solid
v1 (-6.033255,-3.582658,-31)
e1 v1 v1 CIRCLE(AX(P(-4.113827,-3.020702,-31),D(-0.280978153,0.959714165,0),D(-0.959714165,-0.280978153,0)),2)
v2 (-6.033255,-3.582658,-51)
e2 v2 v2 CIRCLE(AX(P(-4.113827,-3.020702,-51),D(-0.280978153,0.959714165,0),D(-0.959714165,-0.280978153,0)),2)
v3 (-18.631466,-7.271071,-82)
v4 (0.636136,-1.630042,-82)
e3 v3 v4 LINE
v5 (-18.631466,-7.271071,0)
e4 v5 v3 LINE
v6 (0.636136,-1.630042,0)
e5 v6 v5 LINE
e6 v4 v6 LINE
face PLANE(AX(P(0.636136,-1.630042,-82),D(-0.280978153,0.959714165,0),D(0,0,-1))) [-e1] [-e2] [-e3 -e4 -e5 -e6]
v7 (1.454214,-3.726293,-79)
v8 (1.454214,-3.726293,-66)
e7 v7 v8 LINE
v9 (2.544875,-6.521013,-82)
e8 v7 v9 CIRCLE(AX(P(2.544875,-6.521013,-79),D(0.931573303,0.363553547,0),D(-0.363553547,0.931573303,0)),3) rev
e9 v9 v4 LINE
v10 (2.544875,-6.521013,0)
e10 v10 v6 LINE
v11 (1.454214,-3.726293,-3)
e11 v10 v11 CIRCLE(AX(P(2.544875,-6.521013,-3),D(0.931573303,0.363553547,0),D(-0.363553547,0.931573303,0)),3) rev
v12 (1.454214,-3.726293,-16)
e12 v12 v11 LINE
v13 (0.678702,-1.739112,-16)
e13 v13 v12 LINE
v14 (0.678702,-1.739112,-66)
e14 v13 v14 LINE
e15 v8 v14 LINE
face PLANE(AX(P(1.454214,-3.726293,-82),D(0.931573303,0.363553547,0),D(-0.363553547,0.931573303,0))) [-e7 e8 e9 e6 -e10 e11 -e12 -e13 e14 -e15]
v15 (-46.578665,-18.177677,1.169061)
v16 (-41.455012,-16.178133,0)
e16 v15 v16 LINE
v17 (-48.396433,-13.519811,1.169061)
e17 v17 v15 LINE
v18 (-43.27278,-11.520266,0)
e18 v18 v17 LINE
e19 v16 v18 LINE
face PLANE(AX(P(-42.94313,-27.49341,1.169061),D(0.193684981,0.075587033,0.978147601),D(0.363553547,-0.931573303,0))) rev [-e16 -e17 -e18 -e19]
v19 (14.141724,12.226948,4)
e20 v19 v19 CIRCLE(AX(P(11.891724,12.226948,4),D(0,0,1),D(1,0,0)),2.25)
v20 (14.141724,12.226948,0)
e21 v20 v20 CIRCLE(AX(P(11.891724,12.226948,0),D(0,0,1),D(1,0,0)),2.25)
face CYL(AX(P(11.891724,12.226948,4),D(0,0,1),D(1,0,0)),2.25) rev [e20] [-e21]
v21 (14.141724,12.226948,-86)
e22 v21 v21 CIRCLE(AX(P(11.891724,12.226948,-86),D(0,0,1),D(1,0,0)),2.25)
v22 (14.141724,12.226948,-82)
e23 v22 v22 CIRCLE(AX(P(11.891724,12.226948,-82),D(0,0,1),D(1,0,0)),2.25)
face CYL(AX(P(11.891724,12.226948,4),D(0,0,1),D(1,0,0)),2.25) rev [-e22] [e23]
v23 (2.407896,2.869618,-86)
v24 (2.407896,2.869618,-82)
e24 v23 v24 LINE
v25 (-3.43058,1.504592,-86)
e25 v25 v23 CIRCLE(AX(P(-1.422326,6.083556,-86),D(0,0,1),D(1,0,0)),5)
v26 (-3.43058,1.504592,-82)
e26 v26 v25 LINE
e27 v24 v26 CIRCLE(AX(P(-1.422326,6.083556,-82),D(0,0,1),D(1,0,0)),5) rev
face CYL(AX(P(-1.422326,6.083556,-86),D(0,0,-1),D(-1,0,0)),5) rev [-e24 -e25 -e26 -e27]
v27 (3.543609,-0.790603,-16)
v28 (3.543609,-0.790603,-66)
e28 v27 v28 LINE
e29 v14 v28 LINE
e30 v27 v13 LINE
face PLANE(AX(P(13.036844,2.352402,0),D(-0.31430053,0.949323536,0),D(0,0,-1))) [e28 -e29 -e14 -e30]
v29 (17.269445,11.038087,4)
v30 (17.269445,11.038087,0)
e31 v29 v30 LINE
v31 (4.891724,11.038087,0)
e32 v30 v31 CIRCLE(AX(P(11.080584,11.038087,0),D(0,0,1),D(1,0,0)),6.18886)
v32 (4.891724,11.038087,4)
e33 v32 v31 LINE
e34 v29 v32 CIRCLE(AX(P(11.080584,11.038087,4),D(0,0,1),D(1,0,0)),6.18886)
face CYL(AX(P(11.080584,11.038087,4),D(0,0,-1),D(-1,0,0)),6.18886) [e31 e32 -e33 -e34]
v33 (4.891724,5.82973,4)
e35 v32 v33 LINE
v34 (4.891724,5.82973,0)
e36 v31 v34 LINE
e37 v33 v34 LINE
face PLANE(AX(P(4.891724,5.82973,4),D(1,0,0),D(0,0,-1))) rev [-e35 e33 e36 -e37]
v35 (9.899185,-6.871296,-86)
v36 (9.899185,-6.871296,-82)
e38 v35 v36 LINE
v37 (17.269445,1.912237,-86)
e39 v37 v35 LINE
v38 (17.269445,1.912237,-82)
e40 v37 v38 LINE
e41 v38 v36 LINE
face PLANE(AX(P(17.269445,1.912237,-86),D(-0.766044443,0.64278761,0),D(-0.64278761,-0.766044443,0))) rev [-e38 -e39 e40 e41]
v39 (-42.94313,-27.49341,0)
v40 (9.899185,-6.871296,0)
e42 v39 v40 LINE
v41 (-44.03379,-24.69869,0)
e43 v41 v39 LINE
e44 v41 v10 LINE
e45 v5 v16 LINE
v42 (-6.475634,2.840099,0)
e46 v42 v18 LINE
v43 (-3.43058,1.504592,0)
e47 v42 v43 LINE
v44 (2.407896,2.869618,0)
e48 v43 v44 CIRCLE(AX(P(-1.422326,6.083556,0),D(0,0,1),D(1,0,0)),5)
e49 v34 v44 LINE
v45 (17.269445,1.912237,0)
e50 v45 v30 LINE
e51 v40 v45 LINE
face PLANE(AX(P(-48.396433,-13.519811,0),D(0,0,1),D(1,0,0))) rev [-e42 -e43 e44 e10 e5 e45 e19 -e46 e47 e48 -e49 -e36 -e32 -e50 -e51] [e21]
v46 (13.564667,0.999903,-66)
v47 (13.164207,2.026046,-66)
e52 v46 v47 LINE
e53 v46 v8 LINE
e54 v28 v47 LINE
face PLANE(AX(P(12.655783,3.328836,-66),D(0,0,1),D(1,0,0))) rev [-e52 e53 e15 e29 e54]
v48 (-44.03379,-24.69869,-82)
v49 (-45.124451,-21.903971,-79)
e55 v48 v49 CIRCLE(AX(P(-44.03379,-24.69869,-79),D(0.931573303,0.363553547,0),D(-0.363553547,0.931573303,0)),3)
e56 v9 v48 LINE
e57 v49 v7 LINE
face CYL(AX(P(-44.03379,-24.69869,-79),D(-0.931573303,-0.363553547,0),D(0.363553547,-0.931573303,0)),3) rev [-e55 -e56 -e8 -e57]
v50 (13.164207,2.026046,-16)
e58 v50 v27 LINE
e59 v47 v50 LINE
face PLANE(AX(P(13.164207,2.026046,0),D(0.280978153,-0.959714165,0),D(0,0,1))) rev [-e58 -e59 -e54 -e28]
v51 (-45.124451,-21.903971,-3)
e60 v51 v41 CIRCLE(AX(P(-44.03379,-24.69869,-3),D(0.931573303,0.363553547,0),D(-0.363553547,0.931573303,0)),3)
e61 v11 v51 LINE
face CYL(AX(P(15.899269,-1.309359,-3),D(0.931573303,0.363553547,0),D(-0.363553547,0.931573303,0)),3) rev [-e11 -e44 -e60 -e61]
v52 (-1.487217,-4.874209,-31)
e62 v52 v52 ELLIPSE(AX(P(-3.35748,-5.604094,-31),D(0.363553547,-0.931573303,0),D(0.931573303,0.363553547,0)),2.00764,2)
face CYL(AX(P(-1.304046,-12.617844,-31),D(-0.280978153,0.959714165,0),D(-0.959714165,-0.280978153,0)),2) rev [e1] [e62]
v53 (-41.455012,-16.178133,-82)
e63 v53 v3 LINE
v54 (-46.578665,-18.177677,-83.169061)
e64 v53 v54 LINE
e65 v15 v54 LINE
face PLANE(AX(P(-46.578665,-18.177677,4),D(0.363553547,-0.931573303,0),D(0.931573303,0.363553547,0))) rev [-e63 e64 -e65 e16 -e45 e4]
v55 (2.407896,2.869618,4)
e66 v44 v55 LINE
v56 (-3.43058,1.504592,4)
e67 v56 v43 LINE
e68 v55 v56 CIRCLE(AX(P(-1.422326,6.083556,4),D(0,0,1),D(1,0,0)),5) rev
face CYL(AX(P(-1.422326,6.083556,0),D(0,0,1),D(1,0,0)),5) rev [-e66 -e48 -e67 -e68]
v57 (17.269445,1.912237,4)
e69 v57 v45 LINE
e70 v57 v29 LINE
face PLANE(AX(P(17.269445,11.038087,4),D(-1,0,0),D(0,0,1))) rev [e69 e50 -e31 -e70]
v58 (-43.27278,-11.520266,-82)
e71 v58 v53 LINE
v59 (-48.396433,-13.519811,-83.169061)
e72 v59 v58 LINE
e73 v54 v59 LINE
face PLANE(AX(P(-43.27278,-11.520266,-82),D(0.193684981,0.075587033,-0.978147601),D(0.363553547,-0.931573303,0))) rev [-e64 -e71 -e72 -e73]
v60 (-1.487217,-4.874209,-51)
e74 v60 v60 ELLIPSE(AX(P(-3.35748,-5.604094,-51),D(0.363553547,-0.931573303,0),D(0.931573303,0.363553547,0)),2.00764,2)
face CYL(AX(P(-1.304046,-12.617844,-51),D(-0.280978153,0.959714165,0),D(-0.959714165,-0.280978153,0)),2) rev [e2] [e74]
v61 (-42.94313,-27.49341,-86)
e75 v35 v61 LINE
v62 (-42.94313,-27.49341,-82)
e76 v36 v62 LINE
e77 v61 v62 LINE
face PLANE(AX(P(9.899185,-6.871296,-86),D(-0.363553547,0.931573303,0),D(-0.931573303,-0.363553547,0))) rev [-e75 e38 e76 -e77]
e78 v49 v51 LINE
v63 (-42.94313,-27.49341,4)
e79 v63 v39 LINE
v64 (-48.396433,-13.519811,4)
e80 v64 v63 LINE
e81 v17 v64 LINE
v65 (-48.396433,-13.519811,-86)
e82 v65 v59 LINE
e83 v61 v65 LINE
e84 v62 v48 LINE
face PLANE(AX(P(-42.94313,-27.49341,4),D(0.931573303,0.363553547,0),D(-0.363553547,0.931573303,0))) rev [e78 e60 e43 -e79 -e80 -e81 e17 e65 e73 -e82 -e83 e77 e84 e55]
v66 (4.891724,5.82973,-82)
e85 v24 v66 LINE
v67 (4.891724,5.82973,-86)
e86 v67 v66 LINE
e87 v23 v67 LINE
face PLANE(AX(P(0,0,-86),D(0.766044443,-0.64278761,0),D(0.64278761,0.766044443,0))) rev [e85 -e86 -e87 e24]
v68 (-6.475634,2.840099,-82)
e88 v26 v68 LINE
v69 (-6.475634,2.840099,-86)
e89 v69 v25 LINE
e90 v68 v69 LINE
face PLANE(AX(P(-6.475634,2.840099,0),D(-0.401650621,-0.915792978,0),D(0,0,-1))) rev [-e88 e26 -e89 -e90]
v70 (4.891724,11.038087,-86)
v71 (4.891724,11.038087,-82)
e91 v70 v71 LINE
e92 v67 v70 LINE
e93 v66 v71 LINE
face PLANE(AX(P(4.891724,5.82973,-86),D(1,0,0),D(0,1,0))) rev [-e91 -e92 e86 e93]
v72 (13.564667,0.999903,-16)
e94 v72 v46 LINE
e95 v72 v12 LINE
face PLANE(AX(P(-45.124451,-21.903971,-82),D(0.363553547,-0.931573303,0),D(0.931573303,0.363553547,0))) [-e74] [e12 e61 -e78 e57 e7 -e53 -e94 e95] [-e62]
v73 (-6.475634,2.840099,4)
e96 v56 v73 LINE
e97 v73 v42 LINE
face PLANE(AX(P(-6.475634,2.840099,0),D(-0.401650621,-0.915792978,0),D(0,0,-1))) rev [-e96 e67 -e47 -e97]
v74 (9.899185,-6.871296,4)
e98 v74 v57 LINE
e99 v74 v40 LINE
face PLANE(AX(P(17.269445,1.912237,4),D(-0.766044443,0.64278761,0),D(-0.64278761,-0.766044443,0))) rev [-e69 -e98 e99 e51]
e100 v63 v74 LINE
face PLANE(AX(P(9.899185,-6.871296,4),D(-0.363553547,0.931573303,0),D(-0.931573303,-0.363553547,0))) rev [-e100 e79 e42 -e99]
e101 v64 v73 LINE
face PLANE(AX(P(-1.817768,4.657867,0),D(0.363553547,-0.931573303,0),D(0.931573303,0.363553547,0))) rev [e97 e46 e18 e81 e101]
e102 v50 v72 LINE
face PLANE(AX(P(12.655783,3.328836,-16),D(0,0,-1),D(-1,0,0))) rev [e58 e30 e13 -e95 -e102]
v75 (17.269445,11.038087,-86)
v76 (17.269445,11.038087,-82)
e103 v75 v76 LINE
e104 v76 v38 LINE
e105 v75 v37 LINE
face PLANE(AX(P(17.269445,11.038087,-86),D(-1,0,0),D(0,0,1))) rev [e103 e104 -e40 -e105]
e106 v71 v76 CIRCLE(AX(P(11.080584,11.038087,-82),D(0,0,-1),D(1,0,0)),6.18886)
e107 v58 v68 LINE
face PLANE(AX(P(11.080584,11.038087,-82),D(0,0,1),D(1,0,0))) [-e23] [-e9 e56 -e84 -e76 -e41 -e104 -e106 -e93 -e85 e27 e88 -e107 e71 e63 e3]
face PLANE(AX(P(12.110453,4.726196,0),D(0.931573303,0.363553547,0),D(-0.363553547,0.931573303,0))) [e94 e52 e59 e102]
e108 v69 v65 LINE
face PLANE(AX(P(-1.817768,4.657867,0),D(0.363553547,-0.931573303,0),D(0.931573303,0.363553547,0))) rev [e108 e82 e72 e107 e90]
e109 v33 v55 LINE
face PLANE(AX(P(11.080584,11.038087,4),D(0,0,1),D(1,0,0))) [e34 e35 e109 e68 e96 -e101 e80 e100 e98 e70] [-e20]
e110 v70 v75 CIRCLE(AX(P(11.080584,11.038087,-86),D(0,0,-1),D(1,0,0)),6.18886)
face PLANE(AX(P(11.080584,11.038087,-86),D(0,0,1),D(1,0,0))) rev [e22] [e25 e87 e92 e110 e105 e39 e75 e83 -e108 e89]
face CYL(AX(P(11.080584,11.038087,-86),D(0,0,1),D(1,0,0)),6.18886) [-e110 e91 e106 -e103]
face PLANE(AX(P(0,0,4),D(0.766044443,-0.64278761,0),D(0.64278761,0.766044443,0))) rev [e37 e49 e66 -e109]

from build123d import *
from OCP.BRepFilletAPI import BRepFilletAPI_MakeChamfer

# Parameters (mm, degrees)
ESTRUSIONE_ESTRUSIONE1_DEPTH = 4
ESTRUSIONE_ESTRUSIONE2_DEPTH = 82
ESTRUSIONE_ESTRUSIONE3_START = 4
ESTRUSIONE_ESTRUSIONE3_DEPTH = 4
FORO_PER_VITE_M4_1_D         = 4.5
FORO_PER_VITE_M4_1_DEPTH     = 188
FORO_PER_VITE_M4_1_TIP       = 1.351936393
SCHIZZO6_W                   = 50
SCHIZZO6_H                   = 4
ESTRUSIONE_ESTRUSIONE4_DEPTH = 5
SMUSSO1_SIZE                 = 5.5
SMUSSO1_SIZE2                = 1.169061089
RACCORDO1_R                  = 3
SMUSSO2_SIZE                 = 5
RACCORDO2_START              = -86
RACCORDO2_DEPTH              = 4
RACCORDO2_2_DEPTH            = 4
SCHIZZO7_W                   = 50
SCHIZZO7_H                   = 2.5
ESTRUSIONE_ESTRUSIONE5_DEPTH = 13
SMUSSO3_SIZE                 = 20
SMUSSO3_SIZE_2               = 1.048155586
SMUSSO4_SIZE                 = 20
SMUSSO4_SIZE2                = 1.749773271
SMUSSO5_SIZE                 = 10
SMUSSO5_SIZE2                = 0.350328071
SCHIZZO8_R                   = 2
TAGLIO_ESTRUSIONE1_DEPTH     = 10


with BuildPart() as part:
    # Schizzo1 → Estrusione-Estrusione1 (new body)
    with BuildSketch(Plane.XY):
        with BuildLine():
            Line((4.891723927, 5.829729564), (4.891723927, 11.038087105))
            ThreePointArc((4.891723927, 11.038087105), (11.08058435, 17.226947528), (17.269444773, 11.038087105))
            Line((17.269444773, 11.038087105), (17.269444773, 1.912236928))
            Line((17.269444773, 1.912236928), (9.899185428, -6.871296125))
            Line((9.899185428, -6.871296125), (-42.94312967, -27.493410377))
            Line((-42.94312967, -27.493410377), (-46.57866514, -18.177677349))
            Line((-46.57866514, -18.177677349), (0, 0))
            Line((0, 0), (4.891723927, 5.829729564))
        make_face()
    extrude(amount=ESTRUSIONE_ESTRUSIONE1_DEPTH)

    # Schizzo4 → Estrusione-Estrusione2 (add)
    with BuildSketch(Plane.XY):
        Polygon((-45.124450952, -21.90397056), (1.454214188, -3.726293211), (0, 0), (-46.57866514, -18.177677349), align=None)
    extrude(amount=-ESTRUSIONE_ESTRUSIONE2_DEPTH)

    # Schizzo5 → Estrusione-Estrusione3 (add)
    with BuildSketch(Plane(origin=(0, 0, -82), x_dir=(-1, 0, 0), z_dir=(0, 0, -1)).offset(ESTRUSIONE_ESTRUSIONE3_START)):
        with BuildLine():
            Line((42.94312967, -27.493410377), (46.57866514, -18.177677349))
            Line((46.57866514, -18.177677349), (0, 0))
            Line((0, 0), (-4.891723927, 5.829729564))
            Line((-4.891723927, 5.829729564), (-4.891723927, 11.038087105))
            ThreePointArc((-4.891723927, 11.038087105), (-11.08058435, 17.226947528), (-17.269444773, 11.038087105))
            Line((-17.269444773, 11.038087105), (-17.269444773, 1.912236928))
            Line((-17.269444773, 1.912236928), (-9.899185428, -6.871296125))
            Line((-9.899185428, -6.871296125), (42.94312967, -27.493410377))
        make_face()
    extrude(amount=-ESTRUSIONE_ESTRUSIONE3_DEPTH)

    # Foro per Vite M4-1
    with Locations(Plane.XY.offset(4)):
        with Locations((11.891723927, 12.226947528)):
            Hole(FORO_PER_VITE_M4_1_D / 2, depth=FORO_PER_VITE_M4_1_DEPTH)
            with Locations((0, 0, -(FORO_PER_VITE_M4_1_DEPTH + FORO_PER_VITE_M4_1_TIP / 2))):  # 118° drill point
                Cone(0, FORO_PER_VITE_M4_1_D / 2, FORO_PER_VITE_M4_1_TIP, mode=Mode.SUBTRACT)

    # Schizzo6 → Estrusione-Estrusione4 (add)
    with BuildSketch(Plane(origin=(0, 0, 0), x_dir=(0.9315733027957475, 0.36355354697516373, 0), z_dir=(-0.36355354697516373, 0.9315733027957475, 0))):
        with Locations((-25, 84)):
            Rectangle(SCHIZZO6_W, SCHIZZO6_H)
        with Locations((-25, -2)):
            Rectangle(SCHIZZO6_W, SCHIZZO6_H)
    extrude(amount=ESTRUSIONE_ESTRUSIONE4_DEPTH)

    # Smusso1: one chamfer whose edges measure the first distance from different faces: ONE call of the kernel's chamfer builder (chamfer() names one face for all edges)
    smusso1_edges_1 = [part.edges().sort_by_distance(p)[0] for p in [
        (-47.487549007, -15.848744092, -82),
    ]]
    smusso1_side_1 = [part.faces().sort_by_distance(p)[0] for p in [
        (-24.198216437, -6.759905417, -82),
    ]]
    smusso1_edges_2 = [part.edges().sort_by_distance(p)[0] for p in [
        (-47.487549007, -15.848744092, 0),
    ]]
    smusso1_side_2 = [part.faces().sort_by_distance(p)[0] for p in [
        (-24.198216437, -6.759905417, 0),
    ]]
    smusso1 = BRepFilletAPI_MakeChamfer(part.part.solid().wrapped)
    for e in smusso1_edges_1:
        smusso1.Add(SMUSSO1_SIZE, SMUSSO1_SIZE2, e.wrapped, smusso1_side_1[0].wrapped)  # the first distance lies on this face
    for e in smusso1_edges_2:
        smusso1.Add(SMUSSO1_SIZE, SMUSSO1_SIZE2, e.wrapped, smusso1_side_2[0].wrapped)  # the first distance lies on this face
    add(Compound.cast(smusso1.Shape()), mode=Mode.REPLACE)

    # Raccordo1
    raccordo1_edges = [part.edges().sort_by_distance(p)[0] for p in [
        (-21.835118382, -12.815131886, -82),
        (-21.835118382, -12.815131886, 0),
    ]]
    fillet(raccordo1_edges, radius=RACCORDO1_R)

    # Smusso2
    smusso2_edges = [part.edges().sort_by_distance(p)[0] for p in [
        (-1.817767735, 4.657866514, 2),
        (-1.817767735, 4.657866514, -84),
    ]]
    chamfer(smusso2_edges, length=SMUSSO2_SIZE - 0.0001)  # a hair under: the kernel refuses the full size

    # Raccordo2: read off the stored shape, not the designer's step
    # Raccordo2 outline → Raccordo2 (add)
    with BuildSketch(Plane.XY.offset(RACCORDO2_START)):
        with BuildLine():
            Line((0, 0), (2.407895765, 2.869618428))
            ThreePointArc((2.407895765, 2.869618428), (-0.284030607, 1.214852073), (-3.430579557, 1.504591587))
            Line((-3.430579557, 1.504591587), (0, 0))
        make_face()
    extrude(amount=RACCORDO2_DEPTH)

    # Raccordo2 2 outline → Raccordo2 2 (add)
    with BuildSketch(Plane.XY):
        with BuildLine():
            Line((0, 0), (2.407895765, 2.869618428))
            ThreePointArc((2.407895765, 2.869618428), (-0.284030607, 1.214852073), (-3.430579557, 1.504591587))
            Line((-3.430579557, 1.504591587), (0, 0))
        make_face()
    extrude(amount=RACCORDO2_2_DEPTH)

    # Schizzo7 → Estrusione-Estrusione5 (add)
    with BuildSketch(Plane(origin=(0, 0, 0), x_dir=(0, 0, -1), z_dir=(0.9315733027957472, 0.3635535469751644, 0))):
        with Locations((41, -2.75)):
            Rectangle(SCHIZZO7_W, SCHIZZO7_H)
    extrude(amount=ESTRUSIONE_ESTRUSIONE5_DEPTH)

    # Smusso3
    # the kernel refuses this chamfer: 20, 1.048155586 mm, written as the material it takes off along each edge
    with BuildSketch(Plane(origin=(12.655783257, 3.328836156, -16), x_dir=(-0.9315733027957472, -0.3635535469751644, 0), z_dir=(0, 0, -1))) as smusso3_piece_1_section:
        Polygon((SMUSSO3_SIZE, 0), (0, -SMUSSO3_SIZE_2), (0, 0), align=None)
    smusso3_piece_1 = extrude(amount=50, mode=Mode.PRIVATE)
    smusso3_piece_1 = split(smusso3_piece_1, bisect_by=Plane(origin=(0.54533032, -1.397359954, -16), z_dir=(0.9315733027957472, 0.36355354697516445, 0)), keep=Keep.TOP, mode=Mode.PRIVATE)
    add(smusso3_piece_1, mode=Mode.SUBTRACT)

    # Smusso4
    smusso4_edges = [part.edges().sort_by_distance(p)[0] for p in [
        (0, 0, -41),
    ]]
    smusso4_side = [part.faces().sort_by_distance(p)[0] for p in [
        (-23.323124739, -9.102026325, -41),
    ]]
    chamfer(smusso4_edges, length=SMUSSO4_SIZE, length2=SMUSSO4_SIZE2, reference=smusso4_side[0])

    # Smusso5
    smusso5_edges = [part.edges().sort_by_distance(p)[0] for p in [
        (13.036843938, 2.352402395, -41),
    ]]
    smusso5_side = [part.faces().sort_by_distance(p)[0] for p in [
        (6.857772748, 0.306645312, -41),
    ]]
    chamfer(smusso5_edges, length=SMUSSO5_SIZE, length2=SMUSSO5_SIZE2, reference=smusso5_side[0])

    # Schizzo8 → Taglio-Estrusione1 (cut)
    with BuildSketch(Plane(origin=(0.489777192, -1.672892017, 0), x_dir=(0.9597141645441053, 0.2809781528400562, 0), z_dir=(-0.2809781528400562, 0.9597141645441053, 0))):
        with Locations(Location((-4.796849429, 31, 0), (0, 0, 180))):
            Circle(SCHIZZO8_R)
        with Locations(Location((-4.796849429, 51, 0), (0, 0, 180))):
            Circle(SCHIZZO8_R)
    extrude(amount=-TAGLIO_ESTRUSIONE1_DEPTH, mode=Mode.SUBTRACT)


solid = part.part
